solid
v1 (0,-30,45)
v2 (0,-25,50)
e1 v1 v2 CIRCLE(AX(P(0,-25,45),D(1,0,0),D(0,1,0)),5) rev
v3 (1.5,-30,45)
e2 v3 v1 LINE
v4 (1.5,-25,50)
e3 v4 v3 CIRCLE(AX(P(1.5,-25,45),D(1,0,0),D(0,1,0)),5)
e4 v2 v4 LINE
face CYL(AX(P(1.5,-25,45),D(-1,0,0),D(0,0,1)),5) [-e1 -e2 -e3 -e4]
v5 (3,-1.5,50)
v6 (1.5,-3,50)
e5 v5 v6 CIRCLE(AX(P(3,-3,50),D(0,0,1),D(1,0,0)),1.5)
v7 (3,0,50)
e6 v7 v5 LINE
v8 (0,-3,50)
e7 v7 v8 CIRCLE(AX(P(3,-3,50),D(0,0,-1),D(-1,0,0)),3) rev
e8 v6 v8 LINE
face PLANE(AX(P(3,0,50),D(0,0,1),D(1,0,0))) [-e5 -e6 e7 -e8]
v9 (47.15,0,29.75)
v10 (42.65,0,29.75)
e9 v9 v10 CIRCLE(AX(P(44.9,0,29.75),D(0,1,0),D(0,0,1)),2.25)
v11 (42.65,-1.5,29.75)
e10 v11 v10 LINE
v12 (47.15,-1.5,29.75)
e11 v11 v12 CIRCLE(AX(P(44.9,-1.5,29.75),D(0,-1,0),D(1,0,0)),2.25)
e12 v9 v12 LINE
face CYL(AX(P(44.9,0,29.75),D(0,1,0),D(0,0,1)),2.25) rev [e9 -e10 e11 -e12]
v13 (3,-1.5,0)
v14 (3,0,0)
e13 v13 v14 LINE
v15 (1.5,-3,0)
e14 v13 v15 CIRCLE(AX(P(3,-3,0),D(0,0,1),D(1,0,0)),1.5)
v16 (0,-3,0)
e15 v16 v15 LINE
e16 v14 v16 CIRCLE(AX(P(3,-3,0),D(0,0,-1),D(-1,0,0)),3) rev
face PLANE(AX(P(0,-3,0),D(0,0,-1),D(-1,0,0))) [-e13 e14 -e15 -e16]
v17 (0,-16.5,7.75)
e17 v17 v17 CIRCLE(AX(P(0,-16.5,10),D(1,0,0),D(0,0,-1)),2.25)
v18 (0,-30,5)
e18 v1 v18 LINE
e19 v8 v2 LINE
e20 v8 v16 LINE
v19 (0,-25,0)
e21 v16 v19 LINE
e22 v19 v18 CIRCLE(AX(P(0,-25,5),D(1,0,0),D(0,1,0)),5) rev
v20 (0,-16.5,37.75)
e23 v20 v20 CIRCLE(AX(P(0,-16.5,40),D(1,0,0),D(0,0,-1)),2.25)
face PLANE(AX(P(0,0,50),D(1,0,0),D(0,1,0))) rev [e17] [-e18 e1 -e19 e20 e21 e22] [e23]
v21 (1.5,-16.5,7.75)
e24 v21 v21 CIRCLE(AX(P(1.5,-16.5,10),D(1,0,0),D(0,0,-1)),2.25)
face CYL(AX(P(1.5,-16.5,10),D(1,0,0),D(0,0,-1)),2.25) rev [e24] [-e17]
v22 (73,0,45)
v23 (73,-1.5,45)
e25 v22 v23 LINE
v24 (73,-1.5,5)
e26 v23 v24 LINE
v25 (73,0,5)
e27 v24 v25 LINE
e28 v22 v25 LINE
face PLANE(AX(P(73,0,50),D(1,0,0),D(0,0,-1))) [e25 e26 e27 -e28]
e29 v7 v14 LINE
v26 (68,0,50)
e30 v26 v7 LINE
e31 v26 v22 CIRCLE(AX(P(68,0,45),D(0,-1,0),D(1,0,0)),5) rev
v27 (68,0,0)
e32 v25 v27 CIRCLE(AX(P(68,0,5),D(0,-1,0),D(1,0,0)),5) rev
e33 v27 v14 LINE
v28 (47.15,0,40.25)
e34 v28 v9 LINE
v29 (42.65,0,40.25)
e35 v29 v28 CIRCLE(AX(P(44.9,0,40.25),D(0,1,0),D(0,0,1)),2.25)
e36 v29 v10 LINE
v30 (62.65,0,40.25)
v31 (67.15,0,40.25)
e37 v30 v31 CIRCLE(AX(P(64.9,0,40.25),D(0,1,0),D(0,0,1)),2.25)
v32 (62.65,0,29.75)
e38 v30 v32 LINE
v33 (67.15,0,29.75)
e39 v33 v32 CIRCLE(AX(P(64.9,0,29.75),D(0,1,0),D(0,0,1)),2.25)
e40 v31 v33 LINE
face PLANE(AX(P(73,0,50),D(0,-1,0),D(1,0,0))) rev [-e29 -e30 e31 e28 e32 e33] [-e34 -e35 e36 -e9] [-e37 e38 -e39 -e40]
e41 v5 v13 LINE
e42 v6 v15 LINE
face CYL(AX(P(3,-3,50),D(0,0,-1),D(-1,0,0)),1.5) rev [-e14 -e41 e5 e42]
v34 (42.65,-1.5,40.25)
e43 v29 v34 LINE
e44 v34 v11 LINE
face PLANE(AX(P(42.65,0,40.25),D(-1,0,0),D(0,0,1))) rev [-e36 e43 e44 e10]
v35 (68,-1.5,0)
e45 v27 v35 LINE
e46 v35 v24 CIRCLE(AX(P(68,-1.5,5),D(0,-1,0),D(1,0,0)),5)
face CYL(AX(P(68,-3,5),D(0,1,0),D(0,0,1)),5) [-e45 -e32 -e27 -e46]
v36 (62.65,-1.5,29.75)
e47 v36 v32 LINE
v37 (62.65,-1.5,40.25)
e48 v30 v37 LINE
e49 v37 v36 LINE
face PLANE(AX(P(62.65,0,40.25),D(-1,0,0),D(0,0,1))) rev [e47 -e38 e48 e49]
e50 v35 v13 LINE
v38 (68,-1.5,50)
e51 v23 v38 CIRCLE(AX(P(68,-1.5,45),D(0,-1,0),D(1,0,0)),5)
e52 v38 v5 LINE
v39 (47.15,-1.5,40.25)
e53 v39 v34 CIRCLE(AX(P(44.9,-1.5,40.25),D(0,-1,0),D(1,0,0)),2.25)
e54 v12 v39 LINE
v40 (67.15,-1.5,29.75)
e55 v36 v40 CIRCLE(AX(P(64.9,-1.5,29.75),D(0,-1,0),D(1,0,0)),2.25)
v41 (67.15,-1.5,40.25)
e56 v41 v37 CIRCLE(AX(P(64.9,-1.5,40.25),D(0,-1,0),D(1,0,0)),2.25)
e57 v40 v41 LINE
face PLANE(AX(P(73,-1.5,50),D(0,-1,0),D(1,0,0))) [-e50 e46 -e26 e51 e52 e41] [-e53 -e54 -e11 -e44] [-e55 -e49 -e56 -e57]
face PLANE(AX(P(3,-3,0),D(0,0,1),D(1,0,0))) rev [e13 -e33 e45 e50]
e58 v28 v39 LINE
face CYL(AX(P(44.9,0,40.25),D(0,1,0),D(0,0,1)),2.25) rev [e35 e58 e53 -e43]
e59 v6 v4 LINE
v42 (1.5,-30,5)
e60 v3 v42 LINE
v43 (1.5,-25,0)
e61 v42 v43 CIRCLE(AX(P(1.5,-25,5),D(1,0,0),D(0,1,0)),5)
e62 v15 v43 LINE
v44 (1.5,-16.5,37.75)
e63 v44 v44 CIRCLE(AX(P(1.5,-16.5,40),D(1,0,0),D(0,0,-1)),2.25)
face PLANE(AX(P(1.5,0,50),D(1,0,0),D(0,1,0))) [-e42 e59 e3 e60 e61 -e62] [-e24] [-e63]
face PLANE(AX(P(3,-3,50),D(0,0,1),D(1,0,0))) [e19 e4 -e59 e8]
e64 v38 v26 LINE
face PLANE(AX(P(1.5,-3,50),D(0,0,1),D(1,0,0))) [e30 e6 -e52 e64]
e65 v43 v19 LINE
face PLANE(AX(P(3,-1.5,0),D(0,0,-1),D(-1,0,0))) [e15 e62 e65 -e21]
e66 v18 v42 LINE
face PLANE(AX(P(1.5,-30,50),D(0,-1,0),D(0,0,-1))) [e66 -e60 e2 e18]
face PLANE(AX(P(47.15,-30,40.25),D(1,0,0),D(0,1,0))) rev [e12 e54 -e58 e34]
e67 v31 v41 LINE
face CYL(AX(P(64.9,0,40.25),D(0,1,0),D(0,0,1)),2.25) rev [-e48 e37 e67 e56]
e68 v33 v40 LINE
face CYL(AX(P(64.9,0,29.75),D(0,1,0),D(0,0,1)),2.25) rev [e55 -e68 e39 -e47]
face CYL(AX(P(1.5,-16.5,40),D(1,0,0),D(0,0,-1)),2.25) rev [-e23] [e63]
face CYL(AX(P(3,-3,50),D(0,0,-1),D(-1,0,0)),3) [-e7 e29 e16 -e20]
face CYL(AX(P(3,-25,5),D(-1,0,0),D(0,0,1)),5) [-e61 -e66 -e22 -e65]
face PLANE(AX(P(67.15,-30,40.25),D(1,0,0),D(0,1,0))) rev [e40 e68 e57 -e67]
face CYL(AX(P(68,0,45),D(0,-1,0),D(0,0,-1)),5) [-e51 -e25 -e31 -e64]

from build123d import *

# Parameters (mm, degrees)
BASE_FLANGE1_DEPTH       = 50
M4_START                 = -1.5
M4_CLEARANCE_SLOT1_DEPTH = 1.5
M4_CLEARANCE_HOLE1_D     = 4.5
FILLET1_R                = 5


# Read off the part's stored shape, not the designer's step: M4 Clearance Slot1
# Sheet-metal steps are written as plain solids
with BuildPart() as part:
    # Sketch1 → Base-Flange1 (new body)
    with BuildSketch(Plane.XY):
        with BuildLine():
            Line((73, 0), (3, 0))
            ThreePointArc((3, 0), (0.878679656, -0.878679656), (0, -3))
            Line((0, -3), (0, -30))
            Line((0, -30), (1.5, -30))
            Line((1.5, -30), (1.5, -3))
            ThreePointArc((1.5, -3), (1.939339828, -1.939339828), (3, -1.5))
            Line((3, -1.5), (73, -1.5))
            Line((73, -1.5), (73, 0))
        make_face()
    extrude(amount=BASE_FLANGE1_DEPTH)

    # M4 Clearance Slot1 outline → M4 Clearance Slot1 (cut)
    with BuildSketch(Plane(origin=(0, 0, 0), x_dir=(1, 0, 0), z_dir=(0, 1, 0)).offset(M4_START)):
        with BuildLine():
            Line((47.15, -40.25), (47.15, -29.75))
            ThreePointArc((47.15, -29.75), (44.9, -27.5), (42.65, -29.75))
            Line((42.65, -29.75), (42.65, -40.25))
            ThreePointArc((42.65, -40.25), (44.9, -42.5), (47.15, -40.25))
        make_face()
        with BuildLine():
            Line((67.15, -40.25), (67.15, -29.75))
            ThreePointArc((67.15, -29.75), (64.9, -27.5), (62.65, -29.75))
            Line((62.65, -29.75), (62.65, -40.25))
            ThreePointArc((62.65, -40.25), (64.9, -42.5), (67.15, -40.25))
        make_face()
    extrude(amount=M4_CLEARANCE_SLOT1_DEPTH, mode=Mode.SUBTRACT)

    # M4 Clearance Hole1 (through all)
    with Locations(Plane(origin=(1.5, 0, 0), x_dir=(0, 0, -1), z_dir=(1, 0, 0))):
        with Locations((-40, -16.5), (-10, -16.5)):
            Hole(M4_CLEARANCE_HOLE1_D / 2)

    # Fillet1
    fillet1_edges = [part.edges().sort_by_distance(p)[0] for p in [
        (73, -0.75, 50),
        (73, -0.75, 0),
        (0.75, -30, 50),
        (0.75, -30, 0),
    ]]
    fillet(fillet1_edges, radius=FILLET1_R)


solid = part.part
